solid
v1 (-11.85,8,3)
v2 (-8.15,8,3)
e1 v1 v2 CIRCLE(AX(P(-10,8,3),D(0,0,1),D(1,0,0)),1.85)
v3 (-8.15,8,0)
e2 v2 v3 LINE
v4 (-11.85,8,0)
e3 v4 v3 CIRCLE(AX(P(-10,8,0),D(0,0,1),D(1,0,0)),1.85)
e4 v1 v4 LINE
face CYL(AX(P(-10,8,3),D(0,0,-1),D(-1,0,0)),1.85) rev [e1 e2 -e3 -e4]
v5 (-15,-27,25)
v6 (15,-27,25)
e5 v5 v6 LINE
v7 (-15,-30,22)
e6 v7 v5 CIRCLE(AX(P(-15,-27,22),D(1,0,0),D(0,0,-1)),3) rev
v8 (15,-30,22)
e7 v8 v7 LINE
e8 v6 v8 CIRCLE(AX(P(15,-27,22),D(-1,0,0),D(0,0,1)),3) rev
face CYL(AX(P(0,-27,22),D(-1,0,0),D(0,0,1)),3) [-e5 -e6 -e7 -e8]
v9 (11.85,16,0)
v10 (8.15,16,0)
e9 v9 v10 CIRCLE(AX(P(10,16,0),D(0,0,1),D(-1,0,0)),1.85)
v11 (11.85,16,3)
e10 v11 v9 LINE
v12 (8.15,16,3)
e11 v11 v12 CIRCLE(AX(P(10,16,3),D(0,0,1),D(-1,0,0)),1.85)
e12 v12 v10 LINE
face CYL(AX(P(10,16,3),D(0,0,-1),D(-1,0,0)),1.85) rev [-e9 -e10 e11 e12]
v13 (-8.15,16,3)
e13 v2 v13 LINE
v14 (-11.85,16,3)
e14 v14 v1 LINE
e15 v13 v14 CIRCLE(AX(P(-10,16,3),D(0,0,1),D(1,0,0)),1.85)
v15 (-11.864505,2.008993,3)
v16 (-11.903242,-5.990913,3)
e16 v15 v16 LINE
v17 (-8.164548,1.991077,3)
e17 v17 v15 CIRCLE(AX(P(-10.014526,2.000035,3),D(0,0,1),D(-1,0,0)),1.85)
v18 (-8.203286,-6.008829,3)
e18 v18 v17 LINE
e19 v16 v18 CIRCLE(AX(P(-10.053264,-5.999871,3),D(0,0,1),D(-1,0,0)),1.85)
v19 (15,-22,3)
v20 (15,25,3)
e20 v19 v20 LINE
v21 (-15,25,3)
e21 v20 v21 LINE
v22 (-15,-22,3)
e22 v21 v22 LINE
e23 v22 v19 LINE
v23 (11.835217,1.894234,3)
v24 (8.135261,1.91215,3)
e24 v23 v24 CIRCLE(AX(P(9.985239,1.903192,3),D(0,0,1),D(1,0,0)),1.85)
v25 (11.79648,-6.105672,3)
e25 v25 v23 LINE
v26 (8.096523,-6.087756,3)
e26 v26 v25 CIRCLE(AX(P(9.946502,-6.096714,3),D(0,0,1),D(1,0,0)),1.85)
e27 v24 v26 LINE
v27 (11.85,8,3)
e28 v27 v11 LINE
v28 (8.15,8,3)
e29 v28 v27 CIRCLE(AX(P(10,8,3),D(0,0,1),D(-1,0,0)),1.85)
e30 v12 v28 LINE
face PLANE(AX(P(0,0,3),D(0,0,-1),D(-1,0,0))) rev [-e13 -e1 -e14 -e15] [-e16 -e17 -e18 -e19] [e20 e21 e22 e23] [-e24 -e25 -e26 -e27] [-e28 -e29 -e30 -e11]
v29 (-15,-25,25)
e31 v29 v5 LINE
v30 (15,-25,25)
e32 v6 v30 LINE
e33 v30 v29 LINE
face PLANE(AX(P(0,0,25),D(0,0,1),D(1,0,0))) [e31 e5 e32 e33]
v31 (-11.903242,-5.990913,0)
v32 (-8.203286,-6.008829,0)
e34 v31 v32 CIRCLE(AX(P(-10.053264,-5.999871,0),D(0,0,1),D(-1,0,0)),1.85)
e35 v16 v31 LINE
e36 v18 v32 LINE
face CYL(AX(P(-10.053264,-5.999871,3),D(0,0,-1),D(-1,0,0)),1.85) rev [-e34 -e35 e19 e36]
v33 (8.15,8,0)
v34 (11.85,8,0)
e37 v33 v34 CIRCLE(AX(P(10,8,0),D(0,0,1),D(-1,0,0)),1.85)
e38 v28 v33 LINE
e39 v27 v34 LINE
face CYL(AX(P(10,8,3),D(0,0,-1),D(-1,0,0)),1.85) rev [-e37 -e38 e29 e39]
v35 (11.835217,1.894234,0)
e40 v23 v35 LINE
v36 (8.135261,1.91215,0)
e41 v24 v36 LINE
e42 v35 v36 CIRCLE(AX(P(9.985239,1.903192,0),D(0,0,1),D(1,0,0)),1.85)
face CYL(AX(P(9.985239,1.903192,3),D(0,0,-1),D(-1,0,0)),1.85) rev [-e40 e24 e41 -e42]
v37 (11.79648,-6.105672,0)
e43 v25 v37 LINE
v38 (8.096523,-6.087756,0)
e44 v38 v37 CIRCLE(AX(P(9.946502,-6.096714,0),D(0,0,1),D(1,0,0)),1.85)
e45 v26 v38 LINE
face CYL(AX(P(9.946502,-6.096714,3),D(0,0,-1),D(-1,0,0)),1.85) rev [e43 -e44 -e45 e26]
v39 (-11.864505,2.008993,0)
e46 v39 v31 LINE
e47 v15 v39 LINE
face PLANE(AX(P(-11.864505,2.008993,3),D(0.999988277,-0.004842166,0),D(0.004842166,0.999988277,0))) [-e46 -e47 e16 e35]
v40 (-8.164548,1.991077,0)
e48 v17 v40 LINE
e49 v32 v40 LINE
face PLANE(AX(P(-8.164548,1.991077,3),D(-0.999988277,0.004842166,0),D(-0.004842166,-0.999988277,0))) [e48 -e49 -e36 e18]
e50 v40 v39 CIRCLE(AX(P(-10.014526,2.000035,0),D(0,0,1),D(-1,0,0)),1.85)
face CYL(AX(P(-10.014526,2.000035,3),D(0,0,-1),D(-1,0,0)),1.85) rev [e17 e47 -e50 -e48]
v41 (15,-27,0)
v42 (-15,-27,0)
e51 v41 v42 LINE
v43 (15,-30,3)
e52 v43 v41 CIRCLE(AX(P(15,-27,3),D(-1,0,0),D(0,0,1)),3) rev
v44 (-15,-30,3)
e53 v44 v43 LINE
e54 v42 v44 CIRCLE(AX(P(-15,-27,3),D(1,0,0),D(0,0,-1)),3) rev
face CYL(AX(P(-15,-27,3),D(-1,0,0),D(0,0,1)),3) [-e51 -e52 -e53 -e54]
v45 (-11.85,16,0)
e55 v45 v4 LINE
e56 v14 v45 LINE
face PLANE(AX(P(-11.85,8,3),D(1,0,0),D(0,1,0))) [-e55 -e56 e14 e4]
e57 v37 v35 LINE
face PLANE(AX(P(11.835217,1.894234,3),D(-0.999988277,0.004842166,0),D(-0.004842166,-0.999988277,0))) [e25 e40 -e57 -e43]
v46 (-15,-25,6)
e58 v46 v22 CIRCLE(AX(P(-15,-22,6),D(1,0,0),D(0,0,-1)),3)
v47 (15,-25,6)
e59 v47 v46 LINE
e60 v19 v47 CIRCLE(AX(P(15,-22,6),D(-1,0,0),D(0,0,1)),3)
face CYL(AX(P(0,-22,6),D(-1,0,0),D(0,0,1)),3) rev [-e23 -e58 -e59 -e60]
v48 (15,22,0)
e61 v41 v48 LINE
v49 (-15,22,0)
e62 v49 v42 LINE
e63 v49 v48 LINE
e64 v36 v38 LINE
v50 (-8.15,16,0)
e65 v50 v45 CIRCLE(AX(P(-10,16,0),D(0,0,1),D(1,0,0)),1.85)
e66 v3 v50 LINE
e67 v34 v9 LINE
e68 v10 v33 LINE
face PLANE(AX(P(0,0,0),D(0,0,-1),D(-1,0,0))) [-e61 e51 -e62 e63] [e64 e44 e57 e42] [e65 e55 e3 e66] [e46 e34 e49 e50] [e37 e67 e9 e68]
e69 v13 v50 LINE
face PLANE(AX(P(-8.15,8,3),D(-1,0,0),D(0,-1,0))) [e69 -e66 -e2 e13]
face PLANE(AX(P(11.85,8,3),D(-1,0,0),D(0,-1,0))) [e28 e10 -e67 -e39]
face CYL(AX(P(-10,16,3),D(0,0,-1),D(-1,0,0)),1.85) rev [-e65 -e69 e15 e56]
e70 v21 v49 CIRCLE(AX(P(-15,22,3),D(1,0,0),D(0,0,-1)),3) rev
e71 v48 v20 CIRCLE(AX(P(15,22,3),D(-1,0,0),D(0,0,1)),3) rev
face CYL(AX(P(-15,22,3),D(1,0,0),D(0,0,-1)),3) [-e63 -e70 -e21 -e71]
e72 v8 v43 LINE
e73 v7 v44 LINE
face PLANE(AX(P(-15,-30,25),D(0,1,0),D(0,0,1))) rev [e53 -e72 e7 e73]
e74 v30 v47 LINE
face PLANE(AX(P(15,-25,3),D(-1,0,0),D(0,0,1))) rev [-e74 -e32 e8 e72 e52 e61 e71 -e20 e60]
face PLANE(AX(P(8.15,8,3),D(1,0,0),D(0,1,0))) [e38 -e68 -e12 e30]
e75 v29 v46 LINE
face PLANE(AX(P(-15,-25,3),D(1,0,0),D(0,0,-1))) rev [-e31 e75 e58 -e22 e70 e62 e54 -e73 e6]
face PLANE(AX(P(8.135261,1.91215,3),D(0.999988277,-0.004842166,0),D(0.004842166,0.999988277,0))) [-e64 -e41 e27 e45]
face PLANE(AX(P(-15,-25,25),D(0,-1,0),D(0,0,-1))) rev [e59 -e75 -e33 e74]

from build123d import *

# Parameters (mm, degrees)
SKETCH1_W           = 30
SKETCH1_H           = 50
BOSS_EXTRUDE1_DEPTH = 3
SKETCH2_W           = 30
SKETCH2_H           = 5
BOSS_EXTRUDE2_DEPTH = 25
FILLET1_R           = 3


with BuildPart() as part:
    # Sketch1 → Boss-Extrude1 (new body)
    with BuildSketch(Plane.XY):
        Rectangle(SKETCH1_W, SKETCH1_H)
        with BuildLine():
            Line((-11.85, 8), (-11.85, 16))
            ThreePointArc((-11.85, 16), (-10, 17.85), (-8.15, 16))
            Line((-8.15, 16), (-8.15, 8))
            ThreePointArc((-8.15, 8), (-10, 6.15), (-11.85, 8))
        make_face(mode=Mode.SUBTRACT)
        with BuildLine():
            Line((11.85, 8), (11.85, 16))
            ThreePointArc((11.85, 16), (10, 17.85), (8.15, 16))
            Line((8.15, 16), (8.15, 8))
            ThreePointArc((8.15, 8), (10, 6.15), (11.85, 8))
        make_face(mode=Mode.SUBTRACT)
        with BuildLine():
            Line((11.835217348, 1.894233852), (11.796480023, -6.105672361))
            ThreePointArc((11.796480023, -6.105672361), (9.937543705, -7.946692666), (8.0965234, -6.087756348))
            Line((8.0965234, -6.087756348), (8.135260724, 1.912149865))
            ThreePointArc((8.135260724, 1.912149865), (9.994197043, 3.75317017), (11.835217348, 1.894233852))
        make_face(mode=Mode.SUBTRACT)
        with BuildLine():
            Line((-11.864504809, 2.008993176), (-11.903242133, -5.990913037))
            ThreePointArc((-11.903242133, -5.990913037), (-10.062221828, -7.849849355), (-8.203285509, -6.008829049))
            Line((-8.203285509, -6.008829049), (-8.164548185, 1.991077164))
            ThreePointArc((-8.164548185, 1.991077164), (-10.00556849, 3.850013482), (-11.864504809, 2.008993176))
        make_face(mode=Mode.SUBTRACT)
    extrude(amount=BOSS_EXTRUDE1_DEPTH)

    # Sketch2 → Boss-Extrude2 (add)
    with BuildSketch(Plane.XY):
        with Locations((0, -27.5)):
            Rectangle(SKETCH2_W, SKETCH2_H)
    extrude(amount=BOSS_EXTRUDE2_DEPTH)

    # Fillet1
    fillet1_edges = [part.edges().sort_by_distance(p)[0] for p in [
        (0, -30, 25),
        (0, -30, 0),
        (0, -25, 3),
        (0, 25, 0),
    ]]
    fillet(fillet1_edges, radius=FILLET1_R - 0.0001)  # a hair under: the kernel refuses the full size


solid = part.part
